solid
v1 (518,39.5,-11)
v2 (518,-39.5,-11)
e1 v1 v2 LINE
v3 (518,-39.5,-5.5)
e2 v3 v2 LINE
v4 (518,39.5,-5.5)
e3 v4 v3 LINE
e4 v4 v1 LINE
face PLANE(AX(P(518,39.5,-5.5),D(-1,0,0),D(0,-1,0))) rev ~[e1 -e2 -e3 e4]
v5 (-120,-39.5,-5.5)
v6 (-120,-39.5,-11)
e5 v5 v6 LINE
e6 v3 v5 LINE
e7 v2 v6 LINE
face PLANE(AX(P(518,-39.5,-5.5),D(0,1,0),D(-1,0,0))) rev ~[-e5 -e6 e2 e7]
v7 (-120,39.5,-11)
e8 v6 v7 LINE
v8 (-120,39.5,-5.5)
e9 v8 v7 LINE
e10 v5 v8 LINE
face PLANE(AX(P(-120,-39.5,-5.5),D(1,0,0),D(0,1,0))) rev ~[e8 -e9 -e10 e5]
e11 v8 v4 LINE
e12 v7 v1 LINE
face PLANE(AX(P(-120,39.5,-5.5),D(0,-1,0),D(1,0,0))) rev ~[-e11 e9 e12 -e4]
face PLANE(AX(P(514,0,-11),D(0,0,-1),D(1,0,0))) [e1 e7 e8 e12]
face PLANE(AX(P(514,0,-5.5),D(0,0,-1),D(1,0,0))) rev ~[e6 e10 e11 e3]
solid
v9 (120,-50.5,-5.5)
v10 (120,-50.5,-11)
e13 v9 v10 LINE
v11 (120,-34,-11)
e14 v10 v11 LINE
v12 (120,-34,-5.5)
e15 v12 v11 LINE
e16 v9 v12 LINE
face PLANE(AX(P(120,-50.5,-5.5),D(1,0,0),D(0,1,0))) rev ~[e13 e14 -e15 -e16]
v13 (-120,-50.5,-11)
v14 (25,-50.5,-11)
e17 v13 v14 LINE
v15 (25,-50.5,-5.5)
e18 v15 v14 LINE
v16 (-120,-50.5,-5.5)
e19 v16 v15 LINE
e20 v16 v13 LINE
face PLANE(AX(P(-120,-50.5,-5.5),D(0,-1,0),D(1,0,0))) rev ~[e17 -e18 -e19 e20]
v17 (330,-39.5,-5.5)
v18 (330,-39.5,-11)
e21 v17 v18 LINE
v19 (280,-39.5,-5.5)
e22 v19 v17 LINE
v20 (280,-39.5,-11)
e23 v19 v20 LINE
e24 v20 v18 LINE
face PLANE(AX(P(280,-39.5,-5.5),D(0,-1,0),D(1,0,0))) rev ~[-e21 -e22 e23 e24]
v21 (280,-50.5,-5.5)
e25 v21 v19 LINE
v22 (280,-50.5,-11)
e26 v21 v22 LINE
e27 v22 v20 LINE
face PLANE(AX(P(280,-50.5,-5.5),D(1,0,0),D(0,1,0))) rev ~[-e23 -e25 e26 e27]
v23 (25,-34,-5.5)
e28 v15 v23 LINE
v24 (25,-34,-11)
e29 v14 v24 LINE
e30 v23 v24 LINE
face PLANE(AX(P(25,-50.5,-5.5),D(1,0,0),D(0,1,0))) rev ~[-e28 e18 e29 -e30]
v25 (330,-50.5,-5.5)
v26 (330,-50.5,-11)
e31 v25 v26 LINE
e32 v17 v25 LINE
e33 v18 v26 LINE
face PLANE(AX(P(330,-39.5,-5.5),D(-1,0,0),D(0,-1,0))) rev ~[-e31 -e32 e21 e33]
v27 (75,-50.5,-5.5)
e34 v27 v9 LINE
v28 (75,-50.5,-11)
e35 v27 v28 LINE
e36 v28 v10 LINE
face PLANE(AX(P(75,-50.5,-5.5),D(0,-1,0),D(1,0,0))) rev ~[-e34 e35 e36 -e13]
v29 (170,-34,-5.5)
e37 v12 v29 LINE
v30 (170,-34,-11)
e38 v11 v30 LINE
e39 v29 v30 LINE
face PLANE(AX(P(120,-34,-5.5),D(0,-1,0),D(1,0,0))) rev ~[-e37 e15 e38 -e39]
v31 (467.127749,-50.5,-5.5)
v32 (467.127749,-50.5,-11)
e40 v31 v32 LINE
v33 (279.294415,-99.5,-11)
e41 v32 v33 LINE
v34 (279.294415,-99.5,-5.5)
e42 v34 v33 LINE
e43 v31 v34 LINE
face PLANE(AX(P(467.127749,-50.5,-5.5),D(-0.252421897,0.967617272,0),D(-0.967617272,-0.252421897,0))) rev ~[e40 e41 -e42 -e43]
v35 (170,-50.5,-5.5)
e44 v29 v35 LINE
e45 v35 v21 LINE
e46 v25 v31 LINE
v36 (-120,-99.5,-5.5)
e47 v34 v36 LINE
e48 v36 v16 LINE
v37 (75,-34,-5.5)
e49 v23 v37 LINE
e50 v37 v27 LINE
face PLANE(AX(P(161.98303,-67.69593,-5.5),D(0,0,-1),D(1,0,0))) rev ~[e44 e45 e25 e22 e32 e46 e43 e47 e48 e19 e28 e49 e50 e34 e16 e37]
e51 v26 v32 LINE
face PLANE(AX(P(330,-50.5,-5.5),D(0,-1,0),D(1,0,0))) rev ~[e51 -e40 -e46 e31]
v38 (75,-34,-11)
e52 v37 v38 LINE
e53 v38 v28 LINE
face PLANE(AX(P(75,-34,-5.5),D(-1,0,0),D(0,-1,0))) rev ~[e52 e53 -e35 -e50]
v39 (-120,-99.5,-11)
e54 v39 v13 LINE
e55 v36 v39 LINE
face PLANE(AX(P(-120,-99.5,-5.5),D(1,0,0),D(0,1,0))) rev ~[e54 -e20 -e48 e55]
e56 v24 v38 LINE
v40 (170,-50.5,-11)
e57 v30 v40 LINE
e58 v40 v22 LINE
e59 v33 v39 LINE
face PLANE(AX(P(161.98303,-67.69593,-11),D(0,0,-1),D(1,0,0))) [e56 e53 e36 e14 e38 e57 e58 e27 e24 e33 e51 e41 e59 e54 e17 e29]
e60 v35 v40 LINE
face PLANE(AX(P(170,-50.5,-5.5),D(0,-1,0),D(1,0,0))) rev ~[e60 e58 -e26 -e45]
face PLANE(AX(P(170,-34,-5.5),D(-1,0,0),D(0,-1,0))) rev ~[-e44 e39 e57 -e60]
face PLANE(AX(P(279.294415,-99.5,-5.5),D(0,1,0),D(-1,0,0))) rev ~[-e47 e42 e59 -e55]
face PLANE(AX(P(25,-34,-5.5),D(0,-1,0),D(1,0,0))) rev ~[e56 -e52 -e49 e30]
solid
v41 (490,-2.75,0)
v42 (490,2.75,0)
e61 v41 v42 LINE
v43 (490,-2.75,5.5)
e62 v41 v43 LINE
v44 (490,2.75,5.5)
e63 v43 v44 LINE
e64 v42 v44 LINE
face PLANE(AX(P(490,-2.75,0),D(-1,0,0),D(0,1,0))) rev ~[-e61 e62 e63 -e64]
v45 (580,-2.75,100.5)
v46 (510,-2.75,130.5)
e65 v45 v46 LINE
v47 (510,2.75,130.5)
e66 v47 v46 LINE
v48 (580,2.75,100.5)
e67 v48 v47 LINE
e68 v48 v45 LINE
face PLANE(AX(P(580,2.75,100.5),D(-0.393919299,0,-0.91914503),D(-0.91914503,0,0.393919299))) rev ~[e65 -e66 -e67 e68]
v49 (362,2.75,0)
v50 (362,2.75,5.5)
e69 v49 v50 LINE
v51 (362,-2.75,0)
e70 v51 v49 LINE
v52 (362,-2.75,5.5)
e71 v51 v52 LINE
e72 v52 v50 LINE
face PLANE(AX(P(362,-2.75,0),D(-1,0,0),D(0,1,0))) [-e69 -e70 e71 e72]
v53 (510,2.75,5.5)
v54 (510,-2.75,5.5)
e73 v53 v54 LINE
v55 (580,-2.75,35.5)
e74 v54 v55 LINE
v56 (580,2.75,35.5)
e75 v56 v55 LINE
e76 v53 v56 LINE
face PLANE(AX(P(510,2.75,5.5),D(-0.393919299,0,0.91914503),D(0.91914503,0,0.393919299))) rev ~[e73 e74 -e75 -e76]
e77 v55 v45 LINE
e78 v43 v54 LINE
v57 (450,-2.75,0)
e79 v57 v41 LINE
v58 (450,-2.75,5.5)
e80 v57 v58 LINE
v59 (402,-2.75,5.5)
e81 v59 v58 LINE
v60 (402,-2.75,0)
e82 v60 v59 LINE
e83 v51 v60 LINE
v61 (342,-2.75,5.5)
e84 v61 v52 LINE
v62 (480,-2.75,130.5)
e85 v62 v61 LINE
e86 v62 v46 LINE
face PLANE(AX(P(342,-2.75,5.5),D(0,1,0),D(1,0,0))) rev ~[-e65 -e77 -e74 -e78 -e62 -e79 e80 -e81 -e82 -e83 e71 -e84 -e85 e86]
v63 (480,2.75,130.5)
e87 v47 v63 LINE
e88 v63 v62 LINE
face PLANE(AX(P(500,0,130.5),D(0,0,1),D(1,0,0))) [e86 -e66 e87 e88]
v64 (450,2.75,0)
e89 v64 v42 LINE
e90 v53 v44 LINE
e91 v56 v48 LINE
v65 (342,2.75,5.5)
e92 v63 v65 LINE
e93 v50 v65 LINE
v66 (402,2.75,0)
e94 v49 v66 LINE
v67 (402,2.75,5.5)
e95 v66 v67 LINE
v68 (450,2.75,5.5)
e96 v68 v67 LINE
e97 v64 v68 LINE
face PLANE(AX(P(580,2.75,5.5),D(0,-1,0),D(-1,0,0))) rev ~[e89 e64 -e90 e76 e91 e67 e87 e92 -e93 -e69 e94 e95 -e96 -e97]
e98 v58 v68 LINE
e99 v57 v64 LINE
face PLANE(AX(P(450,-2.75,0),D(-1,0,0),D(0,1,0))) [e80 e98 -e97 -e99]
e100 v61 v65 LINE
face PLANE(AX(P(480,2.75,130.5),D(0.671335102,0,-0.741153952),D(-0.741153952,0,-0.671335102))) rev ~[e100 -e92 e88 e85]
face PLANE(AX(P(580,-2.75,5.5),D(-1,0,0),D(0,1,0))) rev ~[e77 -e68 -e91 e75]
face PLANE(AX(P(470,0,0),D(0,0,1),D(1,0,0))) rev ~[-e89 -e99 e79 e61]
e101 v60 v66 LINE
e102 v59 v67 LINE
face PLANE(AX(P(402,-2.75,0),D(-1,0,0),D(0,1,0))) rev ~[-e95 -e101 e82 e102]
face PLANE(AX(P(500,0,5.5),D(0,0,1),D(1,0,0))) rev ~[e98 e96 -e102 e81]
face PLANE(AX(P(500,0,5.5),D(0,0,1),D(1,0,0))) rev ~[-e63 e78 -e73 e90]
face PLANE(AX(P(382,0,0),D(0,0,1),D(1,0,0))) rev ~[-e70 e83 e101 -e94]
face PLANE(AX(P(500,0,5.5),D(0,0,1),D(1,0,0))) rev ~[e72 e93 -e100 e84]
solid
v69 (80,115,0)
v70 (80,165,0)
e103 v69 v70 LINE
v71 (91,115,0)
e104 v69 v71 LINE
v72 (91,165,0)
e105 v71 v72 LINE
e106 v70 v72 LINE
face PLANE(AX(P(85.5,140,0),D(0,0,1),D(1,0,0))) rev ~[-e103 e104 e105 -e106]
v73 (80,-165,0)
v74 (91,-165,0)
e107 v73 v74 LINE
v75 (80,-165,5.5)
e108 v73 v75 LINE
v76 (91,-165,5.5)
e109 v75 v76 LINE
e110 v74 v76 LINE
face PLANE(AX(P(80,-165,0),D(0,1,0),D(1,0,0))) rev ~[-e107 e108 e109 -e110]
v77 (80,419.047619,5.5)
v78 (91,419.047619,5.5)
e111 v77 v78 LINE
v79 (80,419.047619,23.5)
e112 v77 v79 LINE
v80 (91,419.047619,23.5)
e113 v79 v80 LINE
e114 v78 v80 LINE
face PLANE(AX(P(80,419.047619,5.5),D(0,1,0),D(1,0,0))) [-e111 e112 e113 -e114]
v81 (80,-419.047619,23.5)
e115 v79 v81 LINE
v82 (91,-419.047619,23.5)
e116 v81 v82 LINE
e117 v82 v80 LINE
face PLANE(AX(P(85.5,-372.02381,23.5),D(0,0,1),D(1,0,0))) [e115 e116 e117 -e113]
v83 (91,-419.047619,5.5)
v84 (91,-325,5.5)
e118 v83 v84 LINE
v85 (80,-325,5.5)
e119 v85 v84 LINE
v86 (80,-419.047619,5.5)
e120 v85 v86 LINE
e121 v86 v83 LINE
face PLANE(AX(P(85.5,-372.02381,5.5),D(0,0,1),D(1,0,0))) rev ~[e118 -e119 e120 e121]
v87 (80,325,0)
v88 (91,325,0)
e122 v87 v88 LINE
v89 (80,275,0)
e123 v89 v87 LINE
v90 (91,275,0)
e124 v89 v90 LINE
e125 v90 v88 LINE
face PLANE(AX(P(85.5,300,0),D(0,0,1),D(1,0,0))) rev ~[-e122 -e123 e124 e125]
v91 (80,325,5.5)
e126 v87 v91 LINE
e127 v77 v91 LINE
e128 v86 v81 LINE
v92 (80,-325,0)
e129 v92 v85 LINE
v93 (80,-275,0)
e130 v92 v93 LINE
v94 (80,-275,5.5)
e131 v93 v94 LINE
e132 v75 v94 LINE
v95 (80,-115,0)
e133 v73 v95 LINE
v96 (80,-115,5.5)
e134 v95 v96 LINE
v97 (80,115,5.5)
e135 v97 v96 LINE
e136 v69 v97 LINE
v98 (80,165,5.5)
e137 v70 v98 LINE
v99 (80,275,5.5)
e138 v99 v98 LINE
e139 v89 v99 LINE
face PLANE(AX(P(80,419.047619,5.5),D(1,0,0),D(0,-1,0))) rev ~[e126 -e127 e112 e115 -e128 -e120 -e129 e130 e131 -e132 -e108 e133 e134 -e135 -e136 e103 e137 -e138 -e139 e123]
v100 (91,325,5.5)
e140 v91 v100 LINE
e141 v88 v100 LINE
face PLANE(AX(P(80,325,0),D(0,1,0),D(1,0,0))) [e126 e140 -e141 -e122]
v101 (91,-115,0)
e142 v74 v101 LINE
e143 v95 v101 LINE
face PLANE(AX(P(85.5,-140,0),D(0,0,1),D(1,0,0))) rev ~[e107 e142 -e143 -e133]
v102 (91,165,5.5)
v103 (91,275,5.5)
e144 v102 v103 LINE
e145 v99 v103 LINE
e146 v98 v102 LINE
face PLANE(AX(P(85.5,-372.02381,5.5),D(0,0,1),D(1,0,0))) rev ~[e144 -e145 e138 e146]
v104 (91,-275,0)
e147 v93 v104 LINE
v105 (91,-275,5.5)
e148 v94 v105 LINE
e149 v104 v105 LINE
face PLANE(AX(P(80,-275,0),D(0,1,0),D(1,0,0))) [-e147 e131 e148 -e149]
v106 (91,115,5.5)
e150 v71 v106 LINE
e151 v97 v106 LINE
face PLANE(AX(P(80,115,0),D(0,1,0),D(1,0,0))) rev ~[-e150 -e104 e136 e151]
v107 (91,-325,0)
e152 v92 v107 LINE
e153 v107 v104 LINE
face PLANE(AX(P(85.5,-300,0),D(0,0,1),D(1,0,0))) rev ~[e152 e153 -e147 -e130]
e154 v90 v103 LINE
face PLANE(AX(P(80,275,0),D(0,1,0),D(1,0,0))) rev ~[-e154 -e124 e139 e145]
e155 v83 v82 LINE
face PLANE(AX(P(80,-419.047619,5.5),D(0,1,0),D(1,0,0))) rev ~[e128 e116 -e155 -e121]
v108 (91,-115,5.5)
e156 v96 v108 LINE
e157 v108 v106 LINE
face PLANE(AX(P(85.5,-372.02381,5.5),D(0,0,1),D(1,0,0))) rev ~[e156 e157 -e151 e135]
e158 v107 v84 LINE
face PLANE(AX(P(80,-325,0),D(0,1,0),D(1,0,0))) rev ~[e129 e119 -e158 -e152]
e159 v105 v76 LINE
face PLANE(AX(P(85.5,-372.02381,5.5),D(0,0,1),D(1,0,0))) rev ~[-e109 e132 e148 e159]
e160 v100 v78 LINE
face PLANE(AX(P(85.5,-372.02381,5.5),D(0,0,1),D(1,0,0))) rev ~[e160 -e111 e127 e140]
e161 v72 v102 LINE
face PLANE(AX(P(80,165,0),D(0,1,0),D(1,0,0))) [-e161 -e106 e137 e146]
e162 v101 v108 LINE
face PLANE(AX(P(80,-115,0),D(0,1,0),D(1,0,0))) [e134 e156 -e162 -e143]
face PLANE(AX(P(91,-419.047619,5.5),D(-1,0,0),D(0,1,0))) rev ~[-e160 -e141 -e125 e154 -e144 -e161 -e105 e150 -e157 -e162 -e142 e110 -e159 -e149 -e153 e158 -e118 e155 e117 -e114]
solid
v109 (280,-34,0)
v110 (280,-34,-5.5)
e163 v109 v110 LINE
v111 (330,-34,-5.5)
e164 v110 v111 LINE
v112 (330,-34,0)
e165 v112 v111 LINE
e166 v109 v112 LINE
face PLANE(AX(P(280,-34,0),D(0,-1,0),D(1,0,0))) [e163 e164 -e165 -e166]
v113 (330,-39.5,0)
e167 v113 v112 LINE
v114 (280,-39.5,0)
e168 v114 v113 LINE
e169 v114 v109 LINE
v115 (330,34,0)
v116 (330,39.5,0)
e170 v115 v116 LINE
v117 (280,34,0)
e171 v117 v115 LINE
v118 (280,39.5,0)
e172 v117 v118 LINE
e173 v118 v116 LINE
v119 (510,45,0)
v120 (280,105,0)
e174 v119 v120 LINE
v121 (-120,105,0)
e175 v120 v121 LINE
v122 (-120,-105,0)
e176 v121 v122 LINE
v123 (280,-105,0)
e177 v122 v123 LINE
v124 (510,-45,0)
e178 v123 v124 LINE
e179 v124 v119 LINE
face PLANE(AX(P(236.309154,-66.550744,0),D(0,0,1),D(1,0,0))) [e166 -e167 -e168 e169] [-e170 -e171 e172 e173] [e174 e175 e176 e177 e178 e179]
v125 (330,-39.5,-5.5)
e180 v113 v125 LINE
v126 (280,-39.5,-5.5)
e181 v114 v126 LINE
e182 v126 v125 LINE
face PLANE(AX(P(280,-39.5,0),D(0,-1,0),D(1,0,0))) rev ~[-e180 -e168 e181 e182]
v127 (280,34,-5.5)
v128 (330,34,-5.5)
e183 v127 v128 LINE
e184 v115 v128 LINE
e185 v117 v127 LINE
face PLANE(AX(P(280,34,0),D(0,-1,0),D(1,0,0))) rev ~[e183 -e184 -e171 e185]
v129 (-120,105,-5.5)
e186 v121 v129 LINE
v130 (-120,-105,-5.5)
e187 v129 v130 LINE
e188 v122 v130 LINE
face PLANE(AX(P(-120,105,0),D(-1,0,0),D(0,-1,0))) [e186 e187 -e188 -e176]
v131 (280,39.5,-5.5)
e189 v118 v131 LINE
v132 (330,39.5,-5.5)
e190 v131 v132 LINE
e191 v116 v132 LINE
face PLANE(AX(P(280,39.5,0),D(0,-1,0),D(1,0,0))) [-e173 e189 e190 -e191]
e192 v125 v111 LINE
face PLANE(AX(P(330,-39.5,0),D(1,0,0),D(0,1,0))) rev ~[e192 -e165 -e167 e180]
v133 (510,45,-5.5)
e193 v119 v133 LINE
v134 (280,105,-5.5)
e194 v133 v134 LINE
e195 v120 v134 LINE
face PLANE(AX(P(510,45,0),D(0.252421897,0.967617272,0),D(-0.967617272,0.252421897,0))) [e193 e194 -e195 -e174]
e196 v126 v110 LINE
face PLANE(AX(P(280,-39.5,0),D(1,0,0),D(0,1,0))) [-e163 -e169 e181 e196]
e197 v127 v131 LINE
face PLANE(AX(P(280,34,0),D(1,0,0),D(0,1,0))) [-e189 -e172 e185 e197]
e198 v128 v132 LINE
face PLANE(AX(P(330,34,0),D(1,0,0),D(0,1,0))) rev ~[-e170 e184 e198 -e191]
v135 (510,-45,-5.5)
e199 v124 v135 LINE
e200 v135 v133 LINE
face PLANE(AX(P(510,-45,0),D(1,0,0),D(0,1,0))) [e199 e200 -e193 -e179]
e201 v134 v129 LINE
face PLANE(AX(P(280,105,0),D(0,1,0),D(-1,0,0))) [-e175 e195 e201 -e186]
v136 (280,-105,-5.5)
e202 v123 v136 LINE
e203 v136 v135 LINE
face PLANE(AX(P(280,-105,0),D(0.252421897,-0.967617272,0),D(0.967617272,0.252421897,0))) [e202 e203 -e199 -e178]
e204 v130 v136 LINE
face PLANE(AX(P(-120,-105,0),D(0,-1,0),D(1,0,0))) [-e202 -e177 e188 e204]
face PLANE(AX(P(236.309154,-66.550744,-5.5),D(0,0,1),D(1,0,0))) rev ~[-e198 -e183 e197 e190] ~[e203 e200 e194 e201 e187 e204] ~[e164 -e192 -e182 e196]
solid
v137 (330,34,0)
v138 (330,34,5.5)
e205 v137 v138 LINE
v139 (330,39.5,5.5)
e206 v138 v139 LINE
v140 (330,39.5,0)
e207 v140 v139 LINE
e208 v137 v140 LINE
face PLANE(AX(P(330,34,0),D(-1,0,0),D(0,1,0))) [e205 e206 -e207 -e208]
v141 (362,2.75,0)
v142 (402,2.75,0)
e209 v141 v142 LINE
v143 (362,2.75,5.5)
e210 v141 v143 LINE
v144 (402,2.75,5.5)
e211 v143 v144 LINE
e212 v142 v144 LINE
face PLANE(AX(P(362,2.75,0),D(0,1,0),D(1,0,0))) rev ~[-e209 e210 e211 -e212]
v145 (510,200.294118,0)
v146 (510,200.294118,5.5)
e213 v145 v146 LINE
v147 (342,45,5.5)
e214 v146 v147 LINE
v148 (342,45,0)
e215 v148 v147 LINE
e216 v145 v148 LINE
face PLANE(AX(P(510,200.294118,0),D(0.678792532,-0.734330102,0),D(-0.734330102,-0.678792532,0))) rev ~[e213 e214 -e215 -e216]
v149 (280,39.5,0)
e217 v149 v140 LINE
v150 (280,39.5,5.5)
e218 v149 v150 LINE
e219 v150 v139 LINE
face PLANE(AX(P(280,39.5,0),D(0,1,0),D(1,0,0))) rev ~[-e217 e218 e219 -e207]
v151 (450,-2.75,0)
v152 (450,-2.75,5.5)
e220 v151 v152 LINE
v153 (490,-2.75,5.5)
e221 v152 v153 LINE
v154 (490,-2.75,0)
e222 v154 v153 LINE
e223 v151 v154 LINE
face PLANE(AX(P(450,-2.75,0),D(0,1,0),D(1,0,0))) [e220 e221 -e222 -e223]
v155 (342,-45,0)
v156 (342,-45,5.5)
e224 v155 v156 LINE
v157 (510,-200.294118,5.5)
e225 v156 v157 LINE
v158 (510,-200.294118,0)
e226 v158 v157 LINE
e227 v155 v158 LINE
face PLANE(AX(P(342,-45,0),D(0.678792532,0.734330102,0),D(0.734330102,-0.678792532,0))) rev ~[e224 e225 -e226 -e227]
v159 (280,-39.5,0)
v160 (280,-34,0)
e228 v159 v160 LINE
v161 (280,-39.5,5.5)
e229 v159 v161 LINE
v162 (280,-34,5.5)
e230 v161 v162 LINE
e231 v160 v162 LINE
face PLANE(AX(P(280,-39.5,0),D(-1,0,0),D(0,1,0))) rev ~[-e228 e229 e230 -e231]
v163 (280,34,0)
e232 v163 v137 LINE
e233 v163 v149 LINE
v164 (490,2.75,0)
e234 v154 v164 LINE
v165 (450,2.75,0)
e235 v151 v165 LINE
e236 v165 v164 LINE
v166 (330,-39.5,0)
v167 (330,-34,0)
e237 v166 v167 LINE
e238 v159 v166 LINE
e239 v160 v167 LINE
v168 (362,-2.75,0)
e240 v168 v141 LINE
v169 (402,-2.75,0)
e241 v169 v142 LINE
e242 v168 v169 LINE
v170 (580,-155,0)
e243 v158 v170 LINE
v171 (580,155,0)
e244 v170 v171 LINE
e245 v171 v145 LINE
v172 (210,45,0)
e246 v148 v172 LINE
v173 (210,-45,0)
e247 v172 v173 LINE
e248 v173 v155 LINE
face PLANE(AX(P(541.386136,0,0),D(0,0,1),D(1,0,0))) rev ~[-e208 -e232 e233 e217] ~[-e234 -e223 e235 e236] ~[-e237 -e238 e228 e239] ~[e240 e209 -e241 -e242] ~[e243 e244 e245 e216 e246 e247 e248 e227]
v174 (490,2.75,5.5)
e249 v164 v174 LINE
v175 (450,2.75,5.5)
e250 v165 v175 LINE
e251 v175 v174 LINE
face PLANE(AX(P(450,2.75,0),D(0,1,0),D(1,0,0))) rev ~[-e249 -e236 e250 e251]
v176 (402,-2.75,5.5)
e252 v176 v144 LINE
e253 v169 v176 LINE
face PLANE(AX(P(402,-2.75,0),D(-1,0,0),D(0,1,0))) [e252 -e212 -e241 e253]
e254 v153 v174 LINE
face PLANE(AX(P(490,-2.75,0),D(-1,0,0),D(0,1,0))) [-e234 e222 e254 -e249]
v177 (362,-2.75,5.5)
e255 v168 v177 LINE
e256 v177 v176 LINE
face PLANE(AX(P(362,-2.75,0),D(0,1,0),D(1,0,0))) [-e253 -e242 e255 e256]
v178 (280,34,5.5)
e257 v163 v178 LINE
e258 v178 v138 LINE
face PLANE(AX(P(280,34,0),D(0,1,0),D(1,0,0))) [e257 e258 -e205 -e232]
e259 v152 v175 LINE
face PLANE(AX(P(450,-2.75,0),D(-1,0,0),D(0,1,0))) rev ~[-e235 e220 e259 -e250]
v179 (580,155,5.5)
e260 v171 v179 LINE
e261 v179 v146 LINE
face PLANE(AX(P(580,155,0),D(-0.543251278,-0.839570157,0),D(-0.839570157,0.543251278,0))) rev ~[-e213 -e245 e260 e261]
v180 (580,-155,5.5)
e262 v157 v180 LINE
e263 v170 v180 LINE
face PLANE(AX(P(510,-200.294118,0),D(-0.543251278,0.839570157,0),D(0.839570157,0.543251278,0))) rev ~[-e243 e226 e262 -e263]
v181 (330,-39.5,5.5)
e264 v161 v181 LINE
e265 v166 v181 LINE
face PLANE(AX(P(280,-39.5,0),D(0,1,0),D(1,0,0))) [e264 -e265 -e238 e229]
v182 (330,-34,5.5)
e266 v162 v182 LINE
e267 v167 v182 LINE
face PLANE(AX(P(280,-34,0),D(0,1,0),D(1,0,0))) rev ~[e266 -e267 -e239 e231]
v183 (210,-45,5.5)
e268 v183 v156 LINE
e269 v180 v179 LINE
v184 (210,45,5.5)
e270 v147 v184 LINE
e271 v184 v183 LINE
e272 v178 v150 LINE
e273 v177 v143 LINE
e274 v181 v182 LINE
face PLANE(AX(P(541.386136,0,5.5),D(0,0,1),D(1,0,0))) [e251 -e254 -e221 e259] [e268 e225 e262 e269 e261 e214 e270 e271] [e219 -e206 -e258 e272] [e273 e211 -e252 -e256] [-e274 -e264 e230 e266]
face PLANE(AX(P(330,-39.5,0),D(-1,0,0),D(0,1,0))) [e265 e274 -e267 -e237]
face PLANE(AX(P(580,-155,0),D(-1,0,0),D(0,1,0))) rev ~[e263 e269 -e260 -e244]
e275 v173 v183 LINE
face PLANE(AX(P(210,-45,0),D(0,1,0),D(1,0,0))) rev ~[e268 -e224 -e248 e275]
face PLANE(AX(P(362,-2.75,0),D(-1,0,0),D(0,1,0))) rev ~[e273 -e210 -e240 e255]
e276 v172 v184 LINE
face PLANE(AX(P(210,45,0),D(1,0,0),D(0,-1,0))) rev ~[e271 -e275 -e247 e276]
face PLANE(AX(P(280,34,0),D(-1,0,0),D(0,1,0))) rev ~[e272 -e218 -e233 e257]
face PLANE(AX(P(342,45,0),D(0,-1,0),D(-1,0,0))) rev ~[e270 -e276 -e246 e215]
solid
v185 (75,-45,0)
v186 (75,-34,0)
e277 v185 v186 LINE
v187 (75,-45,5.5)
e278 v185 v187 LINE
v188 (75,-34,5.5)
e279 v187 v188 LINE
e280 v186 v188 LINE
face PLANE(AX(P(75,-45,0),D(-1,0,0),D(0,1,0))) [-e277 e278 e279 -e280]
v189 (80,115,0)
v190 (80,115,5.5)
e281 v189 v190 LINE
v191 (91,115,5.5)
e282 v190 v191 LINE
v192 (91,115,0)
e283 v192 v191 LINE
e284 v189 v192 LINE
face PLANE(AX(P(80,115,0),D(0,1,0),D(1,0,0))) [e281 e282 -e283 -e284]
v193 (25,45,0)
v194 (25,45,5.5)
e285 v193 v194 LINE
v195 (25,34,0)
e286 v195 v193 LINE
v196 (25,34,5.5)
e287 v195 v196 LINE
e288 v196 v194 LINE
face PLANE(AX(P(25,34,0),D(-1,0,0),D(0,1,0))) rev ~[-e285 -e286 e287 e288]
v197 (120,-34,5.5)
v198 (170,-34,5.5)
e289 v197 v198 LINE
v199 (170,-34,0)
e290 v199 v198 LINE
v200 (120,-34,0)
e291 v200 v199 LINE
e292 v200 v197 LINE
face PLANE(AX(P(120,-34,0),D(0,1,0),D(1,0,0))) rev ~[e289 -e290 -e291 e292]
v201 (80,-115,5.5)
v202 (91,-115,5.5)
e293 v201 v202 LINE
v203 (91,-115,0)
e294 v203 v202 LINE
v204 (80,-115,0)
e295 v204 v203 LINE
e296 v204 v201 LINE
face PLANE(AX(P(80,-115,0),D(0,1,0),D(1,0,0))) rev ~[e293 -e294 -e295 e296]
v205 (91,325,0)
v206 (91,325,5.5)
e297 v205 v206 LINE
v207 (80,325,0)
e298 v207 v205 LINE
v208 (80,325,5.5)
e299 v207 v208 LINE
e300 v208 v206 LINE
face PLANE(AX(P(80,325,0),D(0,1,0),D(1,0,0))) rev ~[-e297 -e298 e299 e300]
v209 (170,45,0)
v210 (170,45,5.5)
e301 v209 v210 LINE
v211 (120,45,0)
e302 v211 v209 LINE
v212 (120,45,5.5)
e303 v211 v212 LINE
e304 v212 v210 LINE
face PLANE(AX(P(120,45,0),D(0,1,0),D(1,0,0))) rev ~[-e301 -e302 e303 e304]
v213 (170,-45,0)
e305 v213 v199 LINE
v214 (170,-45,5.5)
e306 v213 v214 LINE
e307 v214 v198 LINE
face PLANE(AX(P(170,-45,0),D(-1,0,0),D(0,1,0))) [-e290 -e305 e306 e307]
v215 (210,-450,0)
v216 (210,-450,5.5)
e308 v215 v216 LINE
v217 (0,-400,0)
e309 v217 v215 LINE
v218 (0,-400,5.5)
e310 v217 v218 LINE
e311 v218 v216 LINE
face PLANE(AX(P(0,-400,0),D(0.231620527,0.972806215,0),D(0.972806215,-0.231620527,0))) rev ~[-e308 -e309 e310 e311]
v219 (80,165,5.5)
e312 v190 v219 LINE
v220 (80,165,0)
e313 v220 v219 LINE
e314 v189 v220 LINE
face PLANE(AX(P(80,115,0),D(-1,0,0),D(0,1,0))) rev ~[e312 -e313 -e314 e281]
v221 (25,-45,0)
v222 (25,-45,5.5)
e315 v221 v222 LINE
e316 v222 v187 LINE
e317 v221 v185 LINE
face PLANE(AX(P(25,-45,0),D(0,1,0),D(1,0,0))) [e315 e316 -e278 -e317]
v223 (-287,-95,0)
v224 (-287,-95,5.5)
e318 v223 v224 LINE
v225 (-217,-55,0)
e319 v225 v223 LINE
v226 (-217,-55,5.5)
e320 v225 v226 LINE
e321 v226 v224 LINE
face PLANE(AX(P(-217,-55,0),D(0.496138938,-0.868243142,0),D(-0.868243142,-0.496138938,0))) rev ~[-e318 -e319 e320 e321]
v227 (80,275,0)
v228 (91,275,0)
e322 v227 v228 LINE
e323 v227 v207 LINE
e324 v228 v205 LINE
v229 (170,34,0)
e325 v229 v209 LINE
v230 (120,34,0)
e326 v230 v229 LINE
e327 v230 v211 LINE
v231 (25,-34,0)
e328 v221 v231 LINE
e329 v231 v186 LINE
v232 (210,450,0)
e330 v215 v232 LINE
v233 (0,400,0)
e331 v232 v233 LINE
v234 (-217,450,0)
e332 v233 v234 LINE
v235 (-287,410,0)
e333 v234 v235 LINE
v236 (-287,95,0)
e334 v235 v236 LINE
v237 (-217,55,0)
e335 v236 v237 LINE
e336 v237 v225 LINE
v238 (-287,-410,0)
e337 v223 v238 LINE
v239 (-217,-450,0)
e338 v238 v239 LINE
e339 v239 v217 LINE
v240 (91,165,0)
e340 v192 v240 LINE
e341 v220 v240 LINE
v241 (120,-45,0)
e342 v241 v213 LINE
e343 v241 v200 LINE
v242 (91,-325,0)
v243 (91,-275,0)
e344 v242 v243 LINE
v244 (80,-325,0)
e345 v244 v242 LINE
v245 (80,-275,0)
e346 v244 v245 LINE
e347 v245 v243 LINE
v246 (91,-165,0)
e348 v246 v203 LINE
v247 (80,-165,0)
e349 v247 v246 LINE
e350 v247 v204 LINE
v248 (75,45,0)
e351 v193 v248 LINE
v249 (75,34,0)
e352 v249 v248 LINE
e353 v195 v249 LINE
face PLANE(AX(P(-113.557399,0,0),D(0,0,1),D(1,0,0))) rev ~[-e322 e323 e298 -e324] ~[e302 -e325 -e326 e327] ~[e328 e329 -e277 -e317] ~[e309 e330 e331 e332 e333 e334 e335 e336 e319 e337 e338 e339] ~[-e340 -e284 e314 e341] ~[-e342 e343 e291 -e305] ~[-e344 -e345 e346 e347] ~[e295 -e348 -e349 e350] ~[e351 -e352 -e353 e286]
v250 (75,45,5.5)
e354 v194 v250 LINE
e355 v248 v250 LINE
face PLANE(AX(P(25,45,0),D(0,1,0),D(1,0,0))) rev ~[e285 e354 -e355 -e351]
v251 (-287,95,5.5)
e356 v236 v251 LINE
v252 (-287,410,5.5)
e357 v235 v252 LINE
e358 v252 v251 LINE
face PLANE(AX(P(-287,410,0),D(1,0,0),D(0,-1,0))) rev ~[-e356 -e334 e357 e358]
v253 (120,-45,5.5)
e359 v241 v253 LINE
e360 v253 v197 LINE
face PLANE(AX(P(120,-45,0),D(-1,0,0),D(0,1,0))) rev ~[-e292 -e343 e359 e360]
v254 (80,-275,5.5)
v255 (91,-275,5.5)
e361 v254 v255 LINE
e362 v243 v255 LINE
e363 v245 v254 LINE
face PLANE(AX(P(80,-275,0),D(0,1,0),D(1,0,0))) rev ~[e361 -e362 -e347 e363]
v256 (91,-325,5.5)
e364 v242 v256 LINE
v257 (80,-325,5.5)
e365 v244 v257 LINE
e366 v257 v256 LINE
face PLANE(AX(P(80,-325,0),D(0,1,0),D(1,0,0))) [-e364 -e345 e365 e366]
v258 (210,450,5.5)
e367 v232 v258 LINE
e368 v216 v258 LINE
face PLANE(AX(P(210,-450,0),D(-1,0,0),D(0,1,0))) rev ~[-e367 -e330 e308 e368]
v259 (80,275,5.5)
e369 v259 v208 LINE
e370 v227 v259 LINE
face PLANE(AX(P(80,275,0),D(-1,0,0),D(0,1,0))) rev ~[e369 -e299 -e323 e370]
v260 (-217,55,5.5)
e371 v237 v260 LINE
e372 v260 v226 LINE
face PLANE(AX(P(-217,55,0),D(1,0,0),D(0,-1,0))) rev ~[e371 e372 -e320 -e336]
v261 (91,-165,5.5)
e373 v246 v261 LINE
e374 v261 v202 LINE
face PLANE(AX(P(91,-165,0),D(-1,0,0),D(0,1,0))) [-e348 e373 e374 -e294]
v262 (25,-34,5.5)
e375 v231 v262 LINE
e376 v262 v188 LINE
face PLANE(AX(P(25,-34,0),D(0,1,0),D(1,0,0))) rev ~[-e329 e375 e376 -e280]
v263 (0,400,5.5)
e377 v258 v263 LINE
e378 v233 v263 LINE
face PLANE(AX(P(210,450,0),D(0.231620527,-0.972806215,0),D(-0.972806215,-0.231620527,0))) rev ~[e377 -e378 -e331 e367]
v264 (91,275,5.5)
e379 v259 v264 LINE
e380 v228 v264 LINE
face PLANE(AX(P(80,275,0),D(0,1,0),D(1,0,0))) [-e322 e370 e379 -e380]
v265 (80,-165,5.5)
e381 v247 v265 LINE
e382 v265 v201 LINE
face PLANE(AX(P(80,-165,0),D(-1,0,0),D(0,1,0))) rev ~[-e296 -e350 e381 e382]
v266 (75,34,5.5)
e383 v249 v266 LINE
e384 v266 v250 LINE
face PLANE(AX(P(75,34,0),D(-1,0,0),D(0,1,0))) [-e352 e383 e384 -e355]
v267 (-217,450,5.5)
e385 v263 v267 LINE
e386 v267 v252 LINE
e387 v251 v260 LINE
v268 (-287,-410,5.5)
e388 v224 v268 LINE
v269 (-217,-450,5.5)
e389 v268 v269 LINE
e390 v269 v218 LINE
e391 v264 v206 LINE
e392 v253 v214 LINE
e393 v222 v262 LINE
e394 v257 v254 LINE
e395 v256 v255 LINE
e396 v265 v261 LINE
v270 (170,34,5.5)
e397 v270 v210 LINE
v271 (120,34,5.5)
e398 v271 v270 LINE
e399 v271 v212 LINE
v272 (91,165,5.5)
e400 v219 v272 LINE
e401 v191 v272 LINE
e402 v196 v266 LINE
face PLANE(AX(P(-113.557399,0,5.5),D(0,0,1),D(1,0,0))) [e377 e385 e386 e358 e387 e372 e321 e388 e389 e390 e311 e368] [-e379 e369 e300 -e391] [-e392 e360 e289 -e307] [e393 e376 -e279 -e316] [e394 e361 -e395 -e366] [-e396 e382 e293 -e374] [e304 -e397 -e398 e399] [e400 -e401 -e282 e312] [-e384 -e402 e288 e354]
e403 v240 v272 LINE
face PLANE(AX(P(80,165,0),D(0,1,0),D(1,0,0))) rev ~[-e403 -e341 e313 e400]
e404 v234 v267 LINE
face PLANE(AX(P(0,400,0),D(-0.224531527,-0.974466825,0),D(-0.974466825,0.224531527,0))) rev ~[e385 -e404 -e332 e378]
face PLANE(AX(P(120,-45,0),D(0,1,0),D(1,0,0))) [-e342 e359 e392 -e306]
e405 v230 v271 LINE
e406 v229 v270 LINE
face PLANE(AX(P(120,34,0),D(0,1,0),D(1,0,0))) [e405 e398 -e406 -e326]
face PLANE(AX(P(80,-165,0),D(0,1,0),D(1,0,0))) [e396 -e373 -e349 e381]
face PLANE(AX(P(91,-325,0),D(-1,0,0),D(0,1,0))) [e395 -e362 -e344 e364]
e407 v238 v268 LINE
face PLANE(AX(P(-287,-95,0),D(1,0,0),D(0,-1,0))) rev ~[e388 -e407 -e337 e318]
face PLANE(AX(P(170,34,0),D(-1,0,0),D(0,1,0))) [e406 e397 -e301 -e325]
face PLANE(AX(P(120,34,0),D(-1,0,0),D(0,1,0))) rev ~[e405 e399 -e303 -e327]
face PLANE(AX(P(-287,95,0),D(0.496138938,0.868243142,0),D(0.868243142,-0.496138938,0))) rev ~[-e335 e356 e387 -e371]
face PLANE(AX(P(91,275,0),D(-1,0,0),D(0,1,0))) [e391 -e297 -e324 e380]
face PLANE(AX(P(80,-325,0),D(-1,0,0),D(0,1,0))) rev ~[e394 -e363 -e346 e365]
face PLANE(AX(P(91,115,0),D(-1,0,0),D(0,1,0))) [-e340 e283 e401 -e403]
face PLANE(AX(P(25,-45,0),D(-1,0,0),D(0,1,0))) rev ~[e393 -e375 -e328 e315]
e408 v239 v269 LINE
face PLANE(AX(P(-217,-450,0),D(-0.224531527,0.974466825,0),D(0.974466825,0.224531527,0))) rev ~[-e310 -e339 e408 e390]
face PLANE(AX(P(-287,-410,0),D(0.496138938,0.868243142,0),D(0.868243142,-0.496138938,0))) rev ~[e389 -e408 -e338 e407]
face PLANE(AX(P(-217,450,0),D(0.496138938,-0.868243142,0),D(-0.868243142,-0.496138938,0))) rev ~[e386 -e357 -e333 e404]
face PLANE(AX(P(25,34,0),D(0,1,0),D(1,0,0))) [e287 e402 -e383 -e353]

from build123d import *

# Parameters (mm, degrees)
F0_W      = 11
F0_H      = 50
F0_W_2    = 50
F0_H_2    = 11
F1_DEPTH  = 5.5
F2_W      = 11
F2_H      = 94.0476190476
F2_H_2    = 50
F2_H_3    = 110
F2_H_4    = 230
F3_DEPTH  = 18
F4_DEPTH  = 5.5
F5_W      = 50
F5_H      = 5.5
F5_W_2    = 120
F5_H_2    = 60
F6_DEPTH  = 5.5
F8_DEPTH  = 5.5
F9_W      = 50
F9_H      = 5.5
F9_W_2    = 40
F10_DEPTH = 5.5
F11_W     = 40
F11_H     = 5.5
F11_W_2   = 48
F11_W_3   = 20
F12_DEPTH = 125
F13_DEPTH = 5.5
F15_DEPTH = 5.5
F16_W     = 50
F16_H     = 5.5
F17_DEPTH = 5.5


# Not quite as in the source:
# - a feature names something its author has since deleted; it is built from what else it names


with BuildPart() as f1:
    # F0 (on Top) → F1 (new body)
    with BuildSketch(Plane.XY):
        Polygon((0, -400), (0, 0), (0, 400), (-217, 450), (-217, 400), (-217, 55), (-217, -55), (-217, -450), align=None)
        Polygon((-217, 400), (-217, 450), (-287, 410), (-287, 95), (-217, 55), align=None)
        Polygon((0, 400), (0, 0), (0, -400), (210, -450), (210, 0), (210, 450), align=None)
        with Locations((85.5, -300)):
            Rectangle(F0_W, F0_H, mode=Mode.SUBTRACT)
        with Locations((85.5, -140)):
            Rectangle(F0_W, F0_H, mode=Mode.SUBTRACT)
        with Locations((50, -39.5)):
            Rectangle(F0_W_2, F0_H_2, mode=Mode.SUBTRACT)
        with Locations((145, -39.5)):
            Rectangle(F0_W_2, F0_H_2, mode=Mode.SUBTRACT)
        with Locations((50, 39.5)):
            Rectangle(F0_W_2, F0_H_2, mode=Mode.SUBTRACT)
        with Locations((85.5, 140)):
            Rectangle(F0_W, F0_H, mode=Mode.SUBTRACT)
        with Locations((145, 39.5)):
            Rectangle(F0_W_2, F0_H_2, mode=Mode.SUBTRACT)
        with Locations((85.5, 300)):
            Rectangle(F0_W, F0_H, mode=Mode.SUBTRACT)
        Polygon((-287, -410), (-217, -450), (-217, -55), (-287, -95), align=None)
    extrude(amount=F1_DEPTH)


with BuildPart() as f3:
    # F2 (on face) → F3 (new body)
    with BuildSketch(Plane.XY.offset(5.5)):
        with Locations((85.5, -372.0238095238)):
            Rectangle(F2_W, F2_H)
        with Locations((85.5, -300)):
            Rectangle(F2_W, F2_H_2)
        with Locations((85.5, -220)):
            Rectangle(F2_W, F2_H_3)
        with Locations((85.5, -140)):
            Rectangle(F2_W, F2_H_2)
        with Locations((85.5, 0)):
            Rectangle(F2_W, F2_H_4)
        with Locations((85.5, 140)):
            Rectangle(F2_W, F2_H_2)
        with Locations((85.5, 220)):
            Rectangle(F2_W, F2_H_3)
        with Locations((85.5, 372.0238095238)):
            Rectangle(F2_W, F2_H)
        with Locations((85.5, 300)):
            Rectangle(F2_W, F2_H_2)
    extrude(amount=F3_DEPTH)

    # F0 (on Top) → F4 (join)
    with BuildSketch(Plane.XY):
        with Locations((85.5, -300)):
            Rectangle(F0_W, F0_H)
        with Locations((85.5, -140)):
            Rectangle(F0_W, F0_H)
        with Locations((85.5, 140)):
            Rectangle(F0_W, F0_H)
        with Locations((85.5, 300)):
            Rectangle(F0_W, F0_H)
    extrude(amount=F4_DEPTH)


with BuildPart() as f6:
    # F5 (on face) → F6 (new body)
    with BuildSketch(Plane.XY):
        Polygon((280, -105), (510, -45), (210, -45), (170, -45), (170, -34), (120, -34), (120, -45), (75, -45), (75, -34), (25, -34), (25, -45), (0, -45), (0, -105), align=None)
        Polygon((170, 34), (120, 34), (120, 45), (75, 45), (75, 34), (25, 34), (25, 45), (0, 45), (0, 0), (0, -45), (25, -45), (25, -34), (75, -34), (75, -45), (120, -45), (120, -34), (170, -34), (170, -45), (210, -45), (510, -45), (510, 0), (510, 45), (210, 45), (170, 45), align=None)
        with Locations((305, -36.75)):
            Rectangle(F5_W, F5_H, mode=Mode.SUBTRACT)
        with Locations((305, 36.75)):
            Rectangle(F5_W, F5_H, mode=Mode.SUBTRACT)
        Polygon((120, 45), (120, 34), (170, 34), (170, 45), (210, 45), (510, 45), (280, 105), (0, 105), (0, 45), (25, 45), (25, 34), (75, 34), (75, 45), align=None)
        with Locations((-60, 75)):
            Rectangle(F5_W_2, F5_H_2)
        Polygon((0, 0), (0, 45), (-120, 45), (-120, -45), (0, -45), align=None)
        with Locations((-60, -75)):
            Rectangle(F5_W_2, F5_H_2)
    extrude(amount=-F6_DEPTH)


with BuildPart() as f8:
    # F7 (on face) → F8 (new body)
    with BuildSketch(Plane(origin=(0, 0, -5.5), x_dir=(1, 0, 0), z_dir=(0, 0, -1))):
        Polygon((-120, 99.5), (-120, 50.5), (25, 50.5), (25, 39.5), (25, 34), (75, 34), (75, 39.5), (75, 50.5), (120, 50.5), (120, 39.5), (120, 34), (170, 34), (170, 39.5), (170, 50.5), (280, 50.5), (280, 39.5), (330, 39.5), (330, 50.5), (467.1277487393, 50.5), (279.294415406, 99.5), align=None)
    extrude(amount=F8_DEPTH)


with BuildPart() as f10:
    # F9 (on face) → F10 (new body)
    with BuildSketch(Plane.XY):
        Polygon((580, 155), (510, 200.2941176471), (510, 45), (510, 0), (510, -45), (510, -200.2941176471), (580, -155), (580, 0), align=None)
        Polygon((510, -45), (342, -45), (510, -200.2941176471), align=None)
        Polygon((342, 45), (210, 45), (210, -45), (342, -45), (510, -45), (510, 0), (510, 45), align=None)
        with Locations((305, -36.75)):
            Rectangle(F9_W, F9_H, mode=Mode.SUBTRACT)
        with Locations((382, 0)):
            Rectangle(F9_W_2, F9_H, mode=Mode.SUBTRACT)
        with Locations((470, 0)):
            Rectangle(F9_W_2, F9_H, mode=Mode.SUBTRACT)
        with Locations((305, 36.75)):
            Rectangle(F9_W, F9_H, mode=Mode.SUBTRACT)
        Polygon((510, 200.2941176471), (342, 45), (510, 45), align=None)
    extrude(amount=F10_DEPTH)


with BuildPart() as f12:
    # F11 (on face) → F12 (new body)
    with BuildSketch(Plane.XY.offset(5.5)):
        Polygon((490, 2.75), (490, -2.75), (510, -2.75), (510, 0), (510, 2.75), align=None)
        Polygon((510, 0), (510, -2.75), (580, -2.75), (580, 2.75), (510, 2.75), align=None)
        with Locations((470, 0)):
            Rectangle(F11_W, F11_H)
        with Locations((426, 0)):
            Rectangle(F11_W_2, F11_H)
        with Locations((382, 0)):
            Rectangle(F11_W, F11_H)
        with Locations((352, 0)):
            Rectangle(F11_W_3, F11_H)
    extrude(amount=F12_DEPTH)

    # F9 (on face) → F13 (join)
    with BuildSketch(Plane.XY):
        with Locations((470, 0)):
            Rectangle(F9_W_2, F9_H)
        with Locations((382, 0)):
            Rectangle(F9_W_2, F9_H)
    extrude(amount=F13_DEPTH)

    # F14 (on face) → F15 (cut, through all)
    with BuildSketch(Plane(origin=(0, 2.75, 0), x_dir=(-1, 0, 0), z_dir=(0, 1, 0))):
        Polygon((-580, 100.5), (-510, 130.5), (-580, 130.5), align=None)
        Polygon((-580, 5.5), (-510, 5.5), (-580, 35.5), align=None)
        Polygon((-342, 130.5), (-480, 130.5), (-342, 5.5), align=None)
    extrude(amount=-F15_DEPTH, mode=Mode.SUBTRACT)


with BuildPart() as f17:
    # F16 (on face) → F17 (new body)
    with BuildSketch(Plane(origin=(0, 0, -5.5), x_dir=(1, 0, 0), z_dir=(0, 0, -1))):
        Polygon((510, 39.5), (510, -39.5), (518, -39.5), (518, 0), (518, 39.5), align=None)
        with Locations((305, -36.75)):
            Rectangle(F16_W, F16_H)
        Polygon((330, -34), (330, -39.5), (510, -39.5), (510, 39.5), (330, 39.5), (330, 34), (280, 34), (280, -34), align=None)
        Polygon((-120, 0), (-120, -39.5), (280, -39.5), (280, -34), (280, 34), (280, 39.5), (-120, 39.5), align=None)
        with Locations((305, 36.75)):
            Rectangle(F16_W, F16_H)
    extrude(amount=F17_DEPTH)


solid = Compound([f1.part, f3.part, f6.part, f8.part, f10.part, f12.part, f17.part])
